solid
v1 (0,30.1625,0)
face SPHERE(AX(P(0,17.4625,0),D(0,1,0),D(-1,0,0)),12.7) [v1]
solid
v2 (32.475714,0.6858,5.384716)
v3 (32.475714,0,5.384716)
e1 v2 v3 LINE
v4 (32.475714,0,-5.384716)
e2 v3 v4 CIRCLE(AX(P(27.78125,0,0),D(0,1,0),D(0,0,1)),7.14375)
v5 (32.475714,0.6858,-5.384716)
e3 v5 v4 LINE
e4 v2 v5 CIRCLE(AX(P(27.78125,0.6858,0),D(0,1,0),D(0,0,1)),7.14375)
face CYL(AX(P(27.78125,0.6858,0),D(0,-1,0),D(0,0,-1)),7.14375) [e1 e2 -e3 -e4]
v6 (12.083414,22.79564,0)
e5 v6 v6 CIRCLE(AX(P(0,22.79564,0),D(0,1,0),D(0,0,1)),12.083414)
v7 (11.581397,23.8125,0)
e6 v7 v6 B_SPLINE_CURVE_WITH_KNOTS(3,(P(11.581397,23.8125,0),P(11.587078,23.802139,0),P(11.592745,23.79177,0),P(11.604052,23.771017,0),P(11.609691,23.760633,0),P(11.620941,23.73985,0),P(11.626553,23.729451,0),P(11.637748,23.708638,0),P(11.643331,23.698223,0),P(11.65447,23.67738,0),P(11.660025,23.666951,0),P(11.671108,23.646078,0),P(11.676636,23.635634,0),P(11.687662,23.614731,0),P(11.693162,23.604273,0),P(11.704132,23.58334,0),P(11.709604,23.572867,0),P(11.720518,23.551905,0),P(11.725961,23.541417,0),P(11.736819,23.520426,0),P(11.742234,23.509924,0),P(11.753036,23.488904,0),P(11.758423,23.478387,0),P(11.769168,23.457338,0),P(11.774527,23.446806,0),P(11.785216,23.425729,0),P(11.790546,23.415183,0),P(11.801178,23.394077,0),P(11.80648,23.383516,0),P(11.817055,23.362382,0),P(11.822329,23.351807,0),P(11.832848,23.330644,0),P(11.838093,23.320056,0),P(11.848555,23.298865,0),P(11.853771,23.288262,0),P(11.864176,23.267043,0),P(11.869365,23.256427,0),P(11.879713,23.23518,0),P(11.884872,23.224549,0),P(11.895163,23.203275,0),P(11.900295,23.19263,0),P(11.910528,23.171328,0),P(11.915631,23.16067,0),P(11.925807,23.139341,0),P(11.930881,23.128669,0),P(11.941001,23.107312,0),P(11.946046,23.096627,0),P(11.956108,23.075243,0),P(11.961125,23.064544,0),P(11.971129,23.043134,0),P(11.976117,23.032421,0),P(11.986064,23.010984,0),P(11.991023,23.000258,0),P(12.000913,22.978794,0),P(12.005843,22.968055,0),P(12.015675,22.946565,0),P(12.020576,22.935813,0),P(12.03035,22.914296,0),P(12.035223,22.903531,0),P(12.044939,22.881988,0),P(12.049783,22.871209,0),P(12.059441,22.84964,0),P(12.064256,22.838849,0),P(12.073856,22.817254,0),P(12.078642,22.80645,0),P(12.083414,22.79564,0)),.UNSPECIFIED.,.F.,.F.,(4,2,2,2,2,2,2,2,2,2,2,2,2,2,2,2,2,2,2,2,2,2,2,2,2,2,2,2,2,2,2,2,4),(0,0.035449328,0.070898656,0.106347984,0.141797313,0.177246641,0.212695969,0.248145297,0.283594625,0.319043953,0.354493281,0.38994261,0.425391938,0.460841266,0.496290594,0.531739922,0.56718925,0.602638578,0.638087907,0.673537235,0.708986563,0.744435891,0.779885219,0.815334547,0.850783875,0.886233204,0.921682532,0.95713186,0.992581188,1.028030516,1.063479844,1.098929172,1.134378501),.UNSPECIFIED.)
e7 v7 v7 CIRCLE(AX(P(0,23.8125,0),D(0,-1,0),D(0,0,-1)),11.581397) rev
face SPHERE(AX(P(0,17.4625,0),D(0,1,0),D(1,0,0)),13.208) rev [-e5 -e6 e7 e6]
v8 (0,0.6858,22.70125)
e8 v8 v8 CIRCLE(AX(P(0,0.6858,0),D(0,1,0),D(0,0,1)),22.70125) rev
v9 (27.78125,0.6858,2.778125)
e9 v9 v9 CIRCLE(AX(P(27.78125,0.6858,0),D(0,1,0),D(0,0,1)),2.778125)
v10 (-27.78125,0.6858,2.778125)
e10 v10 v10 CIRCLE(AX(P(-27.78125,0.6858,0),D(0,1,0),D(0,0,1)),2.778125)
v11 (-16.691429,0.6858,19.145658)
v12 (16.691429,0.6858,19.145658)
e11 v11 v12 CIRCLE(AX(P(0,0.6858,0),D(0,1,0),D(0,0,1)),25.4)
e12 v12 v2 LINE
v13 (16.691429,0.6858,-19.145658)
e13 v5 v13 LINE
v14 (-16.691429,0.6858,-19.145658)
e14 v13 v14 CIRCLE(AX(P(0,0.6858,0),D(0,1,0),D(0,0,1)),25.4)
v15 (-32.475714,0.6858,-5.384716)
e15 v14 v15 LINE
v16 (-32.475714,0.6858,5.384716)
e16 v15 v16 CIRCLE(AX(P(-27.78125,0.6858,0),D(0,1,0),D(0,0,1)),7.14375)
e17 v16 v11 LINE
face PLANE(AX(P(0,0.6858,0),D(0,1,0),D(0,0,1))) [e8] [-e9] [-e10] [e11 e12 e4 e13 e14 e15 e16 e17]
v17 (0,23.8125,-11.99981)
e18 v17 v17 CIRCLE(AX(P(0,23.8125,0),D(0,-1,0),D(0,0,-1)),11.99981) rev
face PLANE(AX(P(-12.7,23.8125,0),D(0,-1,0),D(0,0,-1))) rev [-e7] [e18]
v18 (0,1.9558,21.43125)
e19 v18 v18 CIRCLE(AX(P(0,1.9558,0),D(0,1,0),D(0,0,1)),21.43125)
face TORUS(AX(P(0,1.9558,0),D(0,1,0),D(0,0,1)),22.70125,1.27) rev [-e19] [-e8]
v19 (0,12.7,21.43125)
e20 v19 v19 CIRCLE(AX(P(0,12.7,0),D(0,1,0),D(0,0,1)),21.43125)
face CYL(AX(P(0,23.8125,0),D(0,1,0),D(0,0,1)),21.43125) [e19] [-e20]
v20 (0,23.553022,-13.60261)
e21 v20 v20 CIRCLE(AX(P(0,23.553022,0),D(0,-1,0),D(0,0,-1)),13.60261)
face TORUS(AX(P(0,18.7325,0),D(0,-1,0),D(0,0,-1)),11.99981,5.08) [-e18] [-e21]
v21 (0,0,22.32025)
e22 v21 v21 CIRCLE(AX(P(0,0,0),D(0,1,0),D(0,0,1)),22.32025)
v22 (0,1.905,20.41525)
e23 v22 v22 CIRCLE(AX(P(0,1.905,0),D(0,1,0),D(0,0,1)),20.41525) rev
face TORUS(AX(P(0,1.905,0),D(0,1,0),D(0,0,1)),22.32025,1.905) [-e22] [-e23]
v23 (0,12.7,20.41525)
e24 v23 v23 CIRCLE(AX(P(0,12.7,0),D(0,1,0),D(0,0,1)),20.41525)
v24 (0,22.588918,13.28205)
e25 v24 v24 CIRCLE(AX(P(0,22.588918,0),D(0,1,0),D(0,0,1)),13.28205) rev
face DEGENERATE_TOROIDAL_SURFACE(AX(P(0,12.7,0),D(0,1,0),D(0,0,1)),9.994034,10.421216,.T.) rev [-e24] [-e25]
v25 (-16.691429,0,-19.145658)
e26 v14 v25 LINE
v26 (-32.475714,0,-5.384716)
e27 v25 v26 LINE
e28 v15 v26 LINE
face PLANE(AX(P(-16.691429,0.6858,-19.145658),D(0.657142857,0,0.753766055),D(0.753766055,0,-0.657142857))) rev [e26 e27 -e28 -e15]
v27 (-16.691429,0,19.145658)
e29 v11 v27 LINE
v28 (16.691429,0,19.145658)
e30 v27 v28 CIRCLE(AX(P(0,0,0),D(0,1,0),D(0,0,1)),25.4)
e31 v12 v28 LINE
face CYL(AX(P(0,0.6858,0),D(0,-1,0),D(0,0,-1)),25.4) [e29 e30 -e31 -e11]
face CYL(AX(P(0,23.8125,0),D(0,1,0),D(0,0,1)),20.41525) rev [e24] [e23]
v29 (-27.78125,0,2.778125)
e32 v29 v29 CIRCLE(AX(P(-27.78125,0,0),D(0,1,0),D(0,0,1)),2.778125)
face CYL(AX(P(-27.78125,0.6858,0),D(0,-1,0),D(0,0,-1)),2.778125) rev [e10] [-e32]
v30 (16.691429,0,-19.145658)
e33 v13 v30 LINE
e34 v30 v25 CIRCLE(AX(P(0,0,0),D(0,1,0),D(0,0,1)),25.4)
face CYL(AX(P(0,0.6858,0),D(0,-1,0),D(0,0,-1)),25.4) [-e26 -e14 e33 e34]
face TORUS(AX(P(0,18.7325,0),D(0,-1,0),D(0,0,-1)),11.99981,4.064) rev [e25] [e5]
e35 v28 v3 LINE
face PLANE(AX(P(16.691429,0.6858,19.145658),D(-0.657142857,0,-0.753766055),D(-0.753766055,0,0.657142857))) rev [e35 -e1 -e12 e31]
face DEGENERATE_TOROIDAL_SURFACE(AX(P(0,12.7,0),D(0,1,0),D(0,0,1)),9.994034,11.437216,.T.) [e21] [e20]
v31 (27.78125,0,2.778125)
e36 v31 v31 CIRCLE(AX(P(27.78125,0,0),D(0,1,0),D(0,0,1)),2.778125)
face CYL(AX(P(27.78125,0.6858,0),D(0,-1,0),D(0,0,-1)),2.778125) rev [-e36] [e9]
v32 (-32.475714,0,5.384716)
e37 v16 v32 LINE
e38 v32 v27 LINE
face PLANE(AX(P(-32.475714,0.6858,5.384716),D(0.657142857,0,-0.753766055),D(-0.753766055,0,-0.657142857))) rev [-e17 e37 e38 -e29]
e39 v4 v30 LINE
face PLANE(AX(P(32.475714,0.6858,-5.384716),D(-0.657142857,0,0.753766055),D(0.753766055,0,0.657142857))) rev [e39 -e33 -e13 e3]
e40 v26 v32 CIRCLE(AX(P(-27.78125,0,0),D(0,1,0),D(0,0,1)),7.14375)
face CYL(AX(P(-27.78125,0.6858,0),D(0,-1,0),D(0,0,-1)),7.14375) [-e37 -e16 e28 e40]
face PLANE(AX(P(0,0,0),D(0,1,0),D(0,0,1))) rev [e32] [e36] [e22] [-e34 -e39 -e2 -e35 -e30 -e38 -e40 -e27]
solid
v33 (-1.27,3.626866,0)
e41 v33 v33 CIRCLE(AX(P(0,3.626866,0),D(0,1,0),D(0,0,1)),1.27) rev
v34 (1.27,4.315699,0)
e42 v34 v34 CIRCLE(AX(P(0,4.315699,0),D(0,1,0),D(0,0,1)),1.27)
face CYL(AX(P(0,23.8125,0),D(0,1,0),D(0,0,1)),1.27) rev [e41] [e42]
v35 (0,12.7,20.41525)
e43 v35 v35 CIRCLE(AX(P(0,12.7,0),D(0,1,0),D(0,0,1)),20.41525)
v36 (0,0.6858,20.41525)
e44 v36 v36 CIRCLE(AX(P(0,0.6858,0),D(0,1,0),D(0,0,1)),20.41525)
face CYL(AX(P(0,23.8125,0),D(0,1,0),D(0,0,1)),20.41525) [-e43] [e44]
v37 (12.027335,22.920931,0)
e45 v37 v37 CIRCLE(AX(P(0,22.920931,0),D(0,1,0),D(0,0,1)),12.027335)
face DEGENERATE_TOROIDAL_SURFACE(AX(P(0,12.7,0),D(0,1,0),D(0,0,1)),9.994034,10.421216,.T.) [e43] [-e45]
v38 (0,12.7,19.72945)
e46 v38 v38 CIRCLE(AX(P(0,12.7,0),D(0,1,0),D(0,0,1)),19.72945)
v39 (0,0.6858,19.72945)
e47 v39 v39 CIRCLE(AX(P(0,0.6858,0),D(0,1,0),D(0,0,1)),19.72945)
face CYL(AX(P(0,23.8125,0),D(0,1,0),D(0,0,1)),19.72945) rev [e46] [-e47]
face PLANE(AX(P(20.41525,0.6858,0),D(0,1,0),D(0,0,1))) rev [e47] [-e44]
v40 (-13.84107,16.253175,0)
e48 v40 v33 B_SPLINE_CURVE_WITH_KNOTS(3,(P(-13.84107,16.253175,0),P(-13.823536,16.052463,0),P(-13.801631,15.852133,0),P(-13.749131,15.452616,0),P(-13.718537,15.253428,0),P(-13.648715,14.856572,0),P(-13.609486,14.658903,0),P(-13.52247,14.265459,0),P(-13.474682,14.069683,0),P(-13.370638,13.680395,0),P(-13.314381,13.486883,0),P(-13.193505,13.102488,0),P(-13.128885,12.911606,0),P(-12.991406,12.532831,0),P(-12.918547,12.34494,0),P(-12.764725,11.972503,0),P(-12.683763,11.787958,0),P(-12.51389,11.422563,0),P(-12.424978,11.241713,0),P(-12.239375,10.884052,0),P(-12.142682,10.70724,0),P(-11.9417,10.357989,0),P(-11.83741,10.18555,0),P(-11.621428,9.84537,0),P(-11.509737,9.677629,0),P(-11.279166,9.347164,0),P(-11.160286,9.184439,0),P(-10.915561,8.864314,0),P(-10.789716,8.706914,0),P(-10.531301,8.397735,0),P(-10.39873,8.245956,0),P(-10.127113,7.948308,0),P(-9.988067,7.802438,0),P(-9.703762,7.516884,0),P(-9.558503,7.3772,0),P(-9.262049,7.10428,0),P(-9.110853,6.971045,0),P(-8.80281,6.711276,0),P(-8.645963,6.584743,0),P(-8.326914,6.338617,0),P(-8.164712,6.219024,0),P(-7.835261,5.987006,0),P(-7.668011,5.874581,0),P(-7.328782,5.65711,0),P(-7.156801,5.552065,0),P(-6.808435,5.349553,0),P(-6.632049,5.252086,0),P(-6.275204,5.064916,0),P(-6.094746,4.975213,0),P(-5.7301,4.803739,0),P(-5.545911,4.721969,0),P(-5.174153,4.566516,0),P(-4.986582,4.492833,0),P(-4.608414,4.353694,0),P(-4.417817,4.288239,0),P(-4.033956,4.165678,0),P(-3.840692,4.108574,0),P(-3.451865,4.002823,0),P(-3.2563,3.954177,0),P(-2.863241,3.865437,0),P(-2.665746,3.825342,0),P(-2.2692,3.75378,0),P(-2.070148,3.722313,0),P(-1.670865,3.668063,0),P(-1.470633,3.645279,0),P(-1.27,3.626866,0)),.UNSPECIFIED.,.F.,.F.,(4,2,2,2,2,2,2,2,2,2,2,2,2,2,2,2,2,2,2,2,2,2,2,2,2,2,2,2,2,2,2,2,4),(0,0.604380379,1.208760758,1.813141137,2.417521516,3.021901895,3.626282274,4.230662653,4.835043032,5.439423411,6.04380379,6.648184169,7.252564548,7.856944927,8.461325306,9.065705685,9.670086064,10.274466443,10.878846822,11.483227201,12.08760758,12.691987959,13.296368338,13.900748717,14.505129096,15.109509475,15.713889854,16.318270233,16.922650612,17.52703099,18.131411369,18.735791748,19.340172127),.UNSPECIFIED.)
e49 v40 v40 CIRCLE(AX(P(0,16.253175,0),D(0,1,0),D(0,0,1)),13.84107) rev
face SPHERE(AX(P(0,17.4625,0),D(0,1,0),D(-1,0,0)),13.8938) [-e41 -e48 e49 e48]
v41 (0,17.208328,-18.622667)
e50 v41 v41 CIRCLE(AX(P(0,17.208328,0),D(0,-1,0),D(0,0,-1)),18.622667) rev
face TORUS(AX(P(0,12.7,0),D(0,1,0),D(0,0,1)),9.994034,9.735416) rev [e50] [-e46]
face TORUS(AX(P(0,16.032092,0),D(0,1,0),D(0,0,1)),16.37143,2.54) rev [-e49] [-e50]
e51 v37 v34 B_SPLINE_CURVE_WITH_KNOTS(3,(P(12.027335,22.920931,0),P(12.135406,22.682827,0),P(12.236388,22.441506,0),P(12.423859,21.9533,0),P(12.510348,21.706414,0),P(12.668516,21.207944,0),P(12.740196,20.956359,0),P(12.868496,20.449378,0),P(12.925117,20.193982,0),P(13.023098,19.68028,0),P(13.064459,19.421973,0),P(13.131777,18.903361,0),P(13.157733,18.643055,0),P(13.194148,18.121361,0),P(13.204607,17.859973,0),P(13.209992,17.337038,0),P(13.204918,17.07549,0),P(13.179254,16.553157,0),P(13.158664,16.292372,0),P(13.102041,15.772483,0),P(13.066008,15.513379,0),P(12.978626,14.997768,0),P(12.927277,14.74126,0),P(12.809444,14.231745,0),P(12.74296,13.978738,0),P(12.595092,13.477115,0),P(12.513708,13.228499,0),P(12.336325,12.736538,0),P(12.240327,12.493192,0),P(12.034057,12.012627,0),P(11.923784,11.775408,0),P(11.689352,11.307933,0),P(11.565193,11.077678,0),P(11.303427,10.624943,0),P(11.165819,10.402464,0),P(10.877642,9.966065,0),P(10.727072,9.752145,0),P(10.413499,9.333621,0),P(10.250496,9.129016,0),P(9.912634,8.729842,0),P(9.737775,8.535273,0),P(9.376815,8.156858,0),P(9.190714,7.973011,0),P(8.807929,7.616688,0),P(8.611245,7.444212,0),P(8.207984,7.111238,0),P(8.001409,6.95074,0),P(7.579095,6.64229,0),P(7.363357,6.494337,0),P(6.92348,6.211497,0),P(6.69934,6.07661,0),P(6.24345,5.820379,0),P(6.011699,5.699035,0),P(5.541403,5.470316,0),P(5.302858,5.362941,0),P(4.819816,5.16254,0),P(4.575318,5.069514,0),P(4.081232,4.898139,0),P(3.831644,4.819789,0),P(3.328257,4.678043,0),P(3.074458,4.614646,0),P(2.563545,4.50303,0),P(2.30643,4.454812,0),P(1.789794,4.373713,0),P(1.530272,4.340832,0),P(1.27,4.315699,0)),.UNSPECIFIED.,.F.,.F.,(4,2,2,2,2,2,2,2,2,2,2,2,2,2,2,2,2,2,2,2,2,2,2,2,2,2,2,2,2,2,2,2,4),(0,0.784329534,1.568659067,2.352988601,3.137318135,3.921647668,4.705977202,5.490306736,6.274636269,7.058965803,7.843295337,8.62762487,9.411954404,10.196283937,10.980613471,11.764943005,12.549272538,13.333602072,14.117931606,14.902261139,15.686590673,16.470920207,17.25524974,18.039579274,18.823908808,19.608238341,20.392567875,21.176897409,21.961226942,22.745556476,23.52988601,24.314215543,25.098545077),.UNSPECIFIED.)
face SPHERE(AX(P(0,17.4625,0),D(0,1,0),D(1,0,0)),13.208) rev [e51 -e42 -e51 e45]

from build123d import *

# Parameters (mm, degrees)
SKETCH2_R           = 2.778125
BOSS_EXTRUDE1_DEPTH = 0.6858
FILLET1_R           = 1.27
FILLET3_R           = 5.08
FILLET4_R           = 1.905
FILLET5_R           = 2.54
SKETCH8_W           = 1.27
SKETCH8_H           = 17.4625


# Read off the part's stored shape, not the designer's step: Shell1, Move Face1, DeleteFace1
with BuildPart() as part:
    # Sketch2 → Boss-Extrude1 (new body)
    with BuildSketch(Plane(origin=(0, 0, 0), x_dir=(1, 0, 0), z_dir=(0, 1, 0))):
        with BuildLine():
            Line((16.691428571, -19.145657791), (32.475714286, -5.384716254))
            ThreePointArc((32.475714286, -5.384716254), (34.925, 0), (32.475714286, 5.384716254))
            Line((32.475714286, 5.384716254), (16.691428571, 19.145657791))
            ThreePointArc((16.691428571, 19.145657791), (0, 25.4), (-16.691428571, 19.145657791))
            Line((-16.691428571, 19.145657791), (-32.475714286, 5.384716254))
            ThreePointArc((-32.475714286, 5.384716254), (-34.925, 0), (-32.475714286, -5.384716254))
            Line((-32.475714286, -5.384716254), (-16.691428571, -19.145657791))
            ThreePointArc((-16.691428571, -19.145657791), (0, -25.4), (16.691428571, -19.145657791))
        make_face()
        with Locations(Location((-27.78125, 0, 0), (0, 0, 270))):
            Circle(SKETCH2_R, mode=Mode.SUBTRACT)
        with Locations(Location((27.78125, 0, 0), (0, 0, 270))):
            Circle(SKETCH2_R, mode=Mode.SUBTRACT)
    extrude(amount=BOSS_EXTRUDE1_DEPTH)

    # Sketch1 → Revolve1 (revolve)
    with BuildSketch(Plane.XY, mode=Mode.PRIVATE) as revolve1_sk:
        with BuildLine():
            Line((12.7, 23.8125), (0, 23.8125))
            Line((0, 23.8125), (0, 0))
            Line((0, 0), (21.43125, 0))
            Line((21.43125, 0), (21.43125, 12.7))
            ThreePointArc((21.43125, 12.7), (18.987326705, 19.766158483), (12.7, 23.8125))
        make_face()
    revolve(revolve1_sk.sketch.rotate(Axis((0, 23.8125, 0), (0, -1, 0)), 90), axis=Axis((0, 23.8125, 0), (0, -1, 0)))

    # Fillet1
    fillet1_edges = [part.edges().sort_by_distance(p)[0] for p in [
        (0, 0.6858, -21.43125),
    ]]
    fillet(fillet1_edges, radius=FILLET1_R)

    # Fillet3
    fillet3_edges = [part.edges().sort_by_distance(p)[0] for p in [
        (0, 23.8125, -12.7),
    ]]
    fillet(fillet3_edges, radius=FILLET3_R)

    # Shell1 outline → Shell1 (revolve, cut)
    with BuildSketch(Plane.XY):
        with BuildLine():
            Line((20.41525, 1.9558), (20.41525, 12.7))
            ThreePointArc((20.41525, 12.7), (18.445864163, 18.796581785), (13.282049846, 22.588917707))
            ThreePointArc((13.282049846, 22.588917707), (12.649277089, 22.744268785), (11.999810216, 22.7965))
            Line((11.999810216, 22.7965), (0, 22.7965))
            Line((0, 22.7965), (0, 0))
            Line((0, 0), (21.517762628, 0))
            ThreePointArc((21.517762628, 0), (20.709862527, 0.833226201), (20.41525, 1.9558))
        make_face()
    revolve(axis=Axis((0, 0, 0), (0, 1, 0)), mode=Mode.SUBTRACT)

    # Sketch6 → Cut-Revolve1 (revolve, cut)
    with BuildSketch(Plane.XY):
        with BuildLine():
            Line((0, 30.1625), (0, 4.7625))
            ThreePointArc((0, 4.7625), (12.7, 17.4625), (0, 30.1625))
        make_face()
    revolve(axis=Axis((0, 30.1625, 0), (0, -1, 0)), mode=Mode.SUBTRACT)

    # Move Face1 outline → Move Face1 (revolve, cut)
    with BuildSketch(Plane.XY):
        with BuildLine():
            Line((11.999810216, 22.795639967), (12.083413512, 22.795639967))
            ThreePointArc((12.083413512, 22.795639967), (11.843323815, 23.309460322), (11.581397319, 23.812500012))
            Line((11.581397319, 23.812500012), (10.998522622, 23.812500011))
            ThreePointArc((10.998522622, 23.812500011), (11.273490805, 23.310440242), (11.525556131, 22.796499988))
            Line((11.525556131, 22.796499988), (11.999810216, 22.7965))
            Line((11.999810216, 22.7965), (11.999810216, 22.795639967))
        make_face()
    revolve(axis=Axis((0, 0, 0), (0, 1, 0)), mode=Mode.SUBTRACT)

    # DeleteFace1 outline → DeleteFace1 (revolve)
    with BuildSketch(Plane.XY):
        with BuildLine():
            Line((20.41525, 1.9558), (20.41525, 0))
            Line((20.41525, 0), (21.517762628, 0))
            ThreePointArc((21.517762628, 0), (20.709862527, 0.833226201), (20.41525, 1.9558))
        make_face()
    revolve(axis=Axis((0, 0, 0), (0, 1, 0)))

    # Fillet4
    fillet4_edges = [part.edges().sort_by_distance(p)[0] for p in [
        (-20.41525, 0, 0),
    ]]
    fillet(fillet4_edges, radius=FILLET4_R)


with BuildPart() as body_2:
    # Sketch3 → Revolve2 (revolve)
    with BuildSketch(Plane.XY):
        with BuildLine():
            Line((0, 30.1625), (0, 4.7625))
            ThreePointArc((0, 4.7625), (12.7, 17.4625), (0, 30.1625))
        make_face()
    revolve(axis=Axis((0, 30.1625, 0), (0, -1, 0)))


with BuildPart() as body_3:
    # Sketch7 → Revolve3 (revolve)
    with BuildSketch(Plane.XY, mode=Mode.PRIVATE) as revolve3_sk:
        with BuildLine():
            Line((19.72945, 0.6858), (19.72945, 12.7))
            ThreePointArc((19.72945, 12.7), (17.920077669, 18.352977633), (13.164521204, 21.90469089))
            ThreePointArc((13.164521204, 21.90469089), (11.286199321, 9.35945222), (0, 3.5687))
            Line((0, 3.5687), (0, 4.2545))
            ThreePointArc((0, 4.2545), (11.102842389, 10.308609109), (12.027335408, 22.920930818))
            ThreePointArc((12.027335408, 22.920930818), (18.049815029, 19.311061526), (20.41525, 12.7))
            Line((20.41525, 12.7), (20.41525, 0.6858))
            Line((20.41525, 0.6858), (19.72945, 0.6858))
        make_face()
    revolve(revolve3_sk.sketch.rotate(Axis((0, 23.8125, 0), (0, -1, 0)), 90), axis=Axis((0, 23.8125, 0), (0, -1, 0)))

    # Fillet5
    fillet5_edges = [body_3.edges().sort_by_distance(p)[0] for p in [
        (0, 21.90469089, -13.164521204),
    ]]
    fillet(fillet5_edges, radius=FILLET5_R)

    # Sketch8 → Cut-Revolve2 (revolve, cut)
    with BuildSketch(Plane.XY, mode=Mode.PRIVATE) as cut_revolve2_sk:
        with Locations((0.635, 8.73125)):
            Rectangle(SKETCH8_W, SKETCH8_H)
    revolve(cut_revolve2_sk.sketch.rotate(Axis((0, 23.8125, 0), (0, -1, 0)), 90), axis=Axis((0, 23.8125, 0), (0, -1, 0)), mode=Mode.SUBTRACT)


solid = Compound([part.part, body_2.part, body_3.part])
